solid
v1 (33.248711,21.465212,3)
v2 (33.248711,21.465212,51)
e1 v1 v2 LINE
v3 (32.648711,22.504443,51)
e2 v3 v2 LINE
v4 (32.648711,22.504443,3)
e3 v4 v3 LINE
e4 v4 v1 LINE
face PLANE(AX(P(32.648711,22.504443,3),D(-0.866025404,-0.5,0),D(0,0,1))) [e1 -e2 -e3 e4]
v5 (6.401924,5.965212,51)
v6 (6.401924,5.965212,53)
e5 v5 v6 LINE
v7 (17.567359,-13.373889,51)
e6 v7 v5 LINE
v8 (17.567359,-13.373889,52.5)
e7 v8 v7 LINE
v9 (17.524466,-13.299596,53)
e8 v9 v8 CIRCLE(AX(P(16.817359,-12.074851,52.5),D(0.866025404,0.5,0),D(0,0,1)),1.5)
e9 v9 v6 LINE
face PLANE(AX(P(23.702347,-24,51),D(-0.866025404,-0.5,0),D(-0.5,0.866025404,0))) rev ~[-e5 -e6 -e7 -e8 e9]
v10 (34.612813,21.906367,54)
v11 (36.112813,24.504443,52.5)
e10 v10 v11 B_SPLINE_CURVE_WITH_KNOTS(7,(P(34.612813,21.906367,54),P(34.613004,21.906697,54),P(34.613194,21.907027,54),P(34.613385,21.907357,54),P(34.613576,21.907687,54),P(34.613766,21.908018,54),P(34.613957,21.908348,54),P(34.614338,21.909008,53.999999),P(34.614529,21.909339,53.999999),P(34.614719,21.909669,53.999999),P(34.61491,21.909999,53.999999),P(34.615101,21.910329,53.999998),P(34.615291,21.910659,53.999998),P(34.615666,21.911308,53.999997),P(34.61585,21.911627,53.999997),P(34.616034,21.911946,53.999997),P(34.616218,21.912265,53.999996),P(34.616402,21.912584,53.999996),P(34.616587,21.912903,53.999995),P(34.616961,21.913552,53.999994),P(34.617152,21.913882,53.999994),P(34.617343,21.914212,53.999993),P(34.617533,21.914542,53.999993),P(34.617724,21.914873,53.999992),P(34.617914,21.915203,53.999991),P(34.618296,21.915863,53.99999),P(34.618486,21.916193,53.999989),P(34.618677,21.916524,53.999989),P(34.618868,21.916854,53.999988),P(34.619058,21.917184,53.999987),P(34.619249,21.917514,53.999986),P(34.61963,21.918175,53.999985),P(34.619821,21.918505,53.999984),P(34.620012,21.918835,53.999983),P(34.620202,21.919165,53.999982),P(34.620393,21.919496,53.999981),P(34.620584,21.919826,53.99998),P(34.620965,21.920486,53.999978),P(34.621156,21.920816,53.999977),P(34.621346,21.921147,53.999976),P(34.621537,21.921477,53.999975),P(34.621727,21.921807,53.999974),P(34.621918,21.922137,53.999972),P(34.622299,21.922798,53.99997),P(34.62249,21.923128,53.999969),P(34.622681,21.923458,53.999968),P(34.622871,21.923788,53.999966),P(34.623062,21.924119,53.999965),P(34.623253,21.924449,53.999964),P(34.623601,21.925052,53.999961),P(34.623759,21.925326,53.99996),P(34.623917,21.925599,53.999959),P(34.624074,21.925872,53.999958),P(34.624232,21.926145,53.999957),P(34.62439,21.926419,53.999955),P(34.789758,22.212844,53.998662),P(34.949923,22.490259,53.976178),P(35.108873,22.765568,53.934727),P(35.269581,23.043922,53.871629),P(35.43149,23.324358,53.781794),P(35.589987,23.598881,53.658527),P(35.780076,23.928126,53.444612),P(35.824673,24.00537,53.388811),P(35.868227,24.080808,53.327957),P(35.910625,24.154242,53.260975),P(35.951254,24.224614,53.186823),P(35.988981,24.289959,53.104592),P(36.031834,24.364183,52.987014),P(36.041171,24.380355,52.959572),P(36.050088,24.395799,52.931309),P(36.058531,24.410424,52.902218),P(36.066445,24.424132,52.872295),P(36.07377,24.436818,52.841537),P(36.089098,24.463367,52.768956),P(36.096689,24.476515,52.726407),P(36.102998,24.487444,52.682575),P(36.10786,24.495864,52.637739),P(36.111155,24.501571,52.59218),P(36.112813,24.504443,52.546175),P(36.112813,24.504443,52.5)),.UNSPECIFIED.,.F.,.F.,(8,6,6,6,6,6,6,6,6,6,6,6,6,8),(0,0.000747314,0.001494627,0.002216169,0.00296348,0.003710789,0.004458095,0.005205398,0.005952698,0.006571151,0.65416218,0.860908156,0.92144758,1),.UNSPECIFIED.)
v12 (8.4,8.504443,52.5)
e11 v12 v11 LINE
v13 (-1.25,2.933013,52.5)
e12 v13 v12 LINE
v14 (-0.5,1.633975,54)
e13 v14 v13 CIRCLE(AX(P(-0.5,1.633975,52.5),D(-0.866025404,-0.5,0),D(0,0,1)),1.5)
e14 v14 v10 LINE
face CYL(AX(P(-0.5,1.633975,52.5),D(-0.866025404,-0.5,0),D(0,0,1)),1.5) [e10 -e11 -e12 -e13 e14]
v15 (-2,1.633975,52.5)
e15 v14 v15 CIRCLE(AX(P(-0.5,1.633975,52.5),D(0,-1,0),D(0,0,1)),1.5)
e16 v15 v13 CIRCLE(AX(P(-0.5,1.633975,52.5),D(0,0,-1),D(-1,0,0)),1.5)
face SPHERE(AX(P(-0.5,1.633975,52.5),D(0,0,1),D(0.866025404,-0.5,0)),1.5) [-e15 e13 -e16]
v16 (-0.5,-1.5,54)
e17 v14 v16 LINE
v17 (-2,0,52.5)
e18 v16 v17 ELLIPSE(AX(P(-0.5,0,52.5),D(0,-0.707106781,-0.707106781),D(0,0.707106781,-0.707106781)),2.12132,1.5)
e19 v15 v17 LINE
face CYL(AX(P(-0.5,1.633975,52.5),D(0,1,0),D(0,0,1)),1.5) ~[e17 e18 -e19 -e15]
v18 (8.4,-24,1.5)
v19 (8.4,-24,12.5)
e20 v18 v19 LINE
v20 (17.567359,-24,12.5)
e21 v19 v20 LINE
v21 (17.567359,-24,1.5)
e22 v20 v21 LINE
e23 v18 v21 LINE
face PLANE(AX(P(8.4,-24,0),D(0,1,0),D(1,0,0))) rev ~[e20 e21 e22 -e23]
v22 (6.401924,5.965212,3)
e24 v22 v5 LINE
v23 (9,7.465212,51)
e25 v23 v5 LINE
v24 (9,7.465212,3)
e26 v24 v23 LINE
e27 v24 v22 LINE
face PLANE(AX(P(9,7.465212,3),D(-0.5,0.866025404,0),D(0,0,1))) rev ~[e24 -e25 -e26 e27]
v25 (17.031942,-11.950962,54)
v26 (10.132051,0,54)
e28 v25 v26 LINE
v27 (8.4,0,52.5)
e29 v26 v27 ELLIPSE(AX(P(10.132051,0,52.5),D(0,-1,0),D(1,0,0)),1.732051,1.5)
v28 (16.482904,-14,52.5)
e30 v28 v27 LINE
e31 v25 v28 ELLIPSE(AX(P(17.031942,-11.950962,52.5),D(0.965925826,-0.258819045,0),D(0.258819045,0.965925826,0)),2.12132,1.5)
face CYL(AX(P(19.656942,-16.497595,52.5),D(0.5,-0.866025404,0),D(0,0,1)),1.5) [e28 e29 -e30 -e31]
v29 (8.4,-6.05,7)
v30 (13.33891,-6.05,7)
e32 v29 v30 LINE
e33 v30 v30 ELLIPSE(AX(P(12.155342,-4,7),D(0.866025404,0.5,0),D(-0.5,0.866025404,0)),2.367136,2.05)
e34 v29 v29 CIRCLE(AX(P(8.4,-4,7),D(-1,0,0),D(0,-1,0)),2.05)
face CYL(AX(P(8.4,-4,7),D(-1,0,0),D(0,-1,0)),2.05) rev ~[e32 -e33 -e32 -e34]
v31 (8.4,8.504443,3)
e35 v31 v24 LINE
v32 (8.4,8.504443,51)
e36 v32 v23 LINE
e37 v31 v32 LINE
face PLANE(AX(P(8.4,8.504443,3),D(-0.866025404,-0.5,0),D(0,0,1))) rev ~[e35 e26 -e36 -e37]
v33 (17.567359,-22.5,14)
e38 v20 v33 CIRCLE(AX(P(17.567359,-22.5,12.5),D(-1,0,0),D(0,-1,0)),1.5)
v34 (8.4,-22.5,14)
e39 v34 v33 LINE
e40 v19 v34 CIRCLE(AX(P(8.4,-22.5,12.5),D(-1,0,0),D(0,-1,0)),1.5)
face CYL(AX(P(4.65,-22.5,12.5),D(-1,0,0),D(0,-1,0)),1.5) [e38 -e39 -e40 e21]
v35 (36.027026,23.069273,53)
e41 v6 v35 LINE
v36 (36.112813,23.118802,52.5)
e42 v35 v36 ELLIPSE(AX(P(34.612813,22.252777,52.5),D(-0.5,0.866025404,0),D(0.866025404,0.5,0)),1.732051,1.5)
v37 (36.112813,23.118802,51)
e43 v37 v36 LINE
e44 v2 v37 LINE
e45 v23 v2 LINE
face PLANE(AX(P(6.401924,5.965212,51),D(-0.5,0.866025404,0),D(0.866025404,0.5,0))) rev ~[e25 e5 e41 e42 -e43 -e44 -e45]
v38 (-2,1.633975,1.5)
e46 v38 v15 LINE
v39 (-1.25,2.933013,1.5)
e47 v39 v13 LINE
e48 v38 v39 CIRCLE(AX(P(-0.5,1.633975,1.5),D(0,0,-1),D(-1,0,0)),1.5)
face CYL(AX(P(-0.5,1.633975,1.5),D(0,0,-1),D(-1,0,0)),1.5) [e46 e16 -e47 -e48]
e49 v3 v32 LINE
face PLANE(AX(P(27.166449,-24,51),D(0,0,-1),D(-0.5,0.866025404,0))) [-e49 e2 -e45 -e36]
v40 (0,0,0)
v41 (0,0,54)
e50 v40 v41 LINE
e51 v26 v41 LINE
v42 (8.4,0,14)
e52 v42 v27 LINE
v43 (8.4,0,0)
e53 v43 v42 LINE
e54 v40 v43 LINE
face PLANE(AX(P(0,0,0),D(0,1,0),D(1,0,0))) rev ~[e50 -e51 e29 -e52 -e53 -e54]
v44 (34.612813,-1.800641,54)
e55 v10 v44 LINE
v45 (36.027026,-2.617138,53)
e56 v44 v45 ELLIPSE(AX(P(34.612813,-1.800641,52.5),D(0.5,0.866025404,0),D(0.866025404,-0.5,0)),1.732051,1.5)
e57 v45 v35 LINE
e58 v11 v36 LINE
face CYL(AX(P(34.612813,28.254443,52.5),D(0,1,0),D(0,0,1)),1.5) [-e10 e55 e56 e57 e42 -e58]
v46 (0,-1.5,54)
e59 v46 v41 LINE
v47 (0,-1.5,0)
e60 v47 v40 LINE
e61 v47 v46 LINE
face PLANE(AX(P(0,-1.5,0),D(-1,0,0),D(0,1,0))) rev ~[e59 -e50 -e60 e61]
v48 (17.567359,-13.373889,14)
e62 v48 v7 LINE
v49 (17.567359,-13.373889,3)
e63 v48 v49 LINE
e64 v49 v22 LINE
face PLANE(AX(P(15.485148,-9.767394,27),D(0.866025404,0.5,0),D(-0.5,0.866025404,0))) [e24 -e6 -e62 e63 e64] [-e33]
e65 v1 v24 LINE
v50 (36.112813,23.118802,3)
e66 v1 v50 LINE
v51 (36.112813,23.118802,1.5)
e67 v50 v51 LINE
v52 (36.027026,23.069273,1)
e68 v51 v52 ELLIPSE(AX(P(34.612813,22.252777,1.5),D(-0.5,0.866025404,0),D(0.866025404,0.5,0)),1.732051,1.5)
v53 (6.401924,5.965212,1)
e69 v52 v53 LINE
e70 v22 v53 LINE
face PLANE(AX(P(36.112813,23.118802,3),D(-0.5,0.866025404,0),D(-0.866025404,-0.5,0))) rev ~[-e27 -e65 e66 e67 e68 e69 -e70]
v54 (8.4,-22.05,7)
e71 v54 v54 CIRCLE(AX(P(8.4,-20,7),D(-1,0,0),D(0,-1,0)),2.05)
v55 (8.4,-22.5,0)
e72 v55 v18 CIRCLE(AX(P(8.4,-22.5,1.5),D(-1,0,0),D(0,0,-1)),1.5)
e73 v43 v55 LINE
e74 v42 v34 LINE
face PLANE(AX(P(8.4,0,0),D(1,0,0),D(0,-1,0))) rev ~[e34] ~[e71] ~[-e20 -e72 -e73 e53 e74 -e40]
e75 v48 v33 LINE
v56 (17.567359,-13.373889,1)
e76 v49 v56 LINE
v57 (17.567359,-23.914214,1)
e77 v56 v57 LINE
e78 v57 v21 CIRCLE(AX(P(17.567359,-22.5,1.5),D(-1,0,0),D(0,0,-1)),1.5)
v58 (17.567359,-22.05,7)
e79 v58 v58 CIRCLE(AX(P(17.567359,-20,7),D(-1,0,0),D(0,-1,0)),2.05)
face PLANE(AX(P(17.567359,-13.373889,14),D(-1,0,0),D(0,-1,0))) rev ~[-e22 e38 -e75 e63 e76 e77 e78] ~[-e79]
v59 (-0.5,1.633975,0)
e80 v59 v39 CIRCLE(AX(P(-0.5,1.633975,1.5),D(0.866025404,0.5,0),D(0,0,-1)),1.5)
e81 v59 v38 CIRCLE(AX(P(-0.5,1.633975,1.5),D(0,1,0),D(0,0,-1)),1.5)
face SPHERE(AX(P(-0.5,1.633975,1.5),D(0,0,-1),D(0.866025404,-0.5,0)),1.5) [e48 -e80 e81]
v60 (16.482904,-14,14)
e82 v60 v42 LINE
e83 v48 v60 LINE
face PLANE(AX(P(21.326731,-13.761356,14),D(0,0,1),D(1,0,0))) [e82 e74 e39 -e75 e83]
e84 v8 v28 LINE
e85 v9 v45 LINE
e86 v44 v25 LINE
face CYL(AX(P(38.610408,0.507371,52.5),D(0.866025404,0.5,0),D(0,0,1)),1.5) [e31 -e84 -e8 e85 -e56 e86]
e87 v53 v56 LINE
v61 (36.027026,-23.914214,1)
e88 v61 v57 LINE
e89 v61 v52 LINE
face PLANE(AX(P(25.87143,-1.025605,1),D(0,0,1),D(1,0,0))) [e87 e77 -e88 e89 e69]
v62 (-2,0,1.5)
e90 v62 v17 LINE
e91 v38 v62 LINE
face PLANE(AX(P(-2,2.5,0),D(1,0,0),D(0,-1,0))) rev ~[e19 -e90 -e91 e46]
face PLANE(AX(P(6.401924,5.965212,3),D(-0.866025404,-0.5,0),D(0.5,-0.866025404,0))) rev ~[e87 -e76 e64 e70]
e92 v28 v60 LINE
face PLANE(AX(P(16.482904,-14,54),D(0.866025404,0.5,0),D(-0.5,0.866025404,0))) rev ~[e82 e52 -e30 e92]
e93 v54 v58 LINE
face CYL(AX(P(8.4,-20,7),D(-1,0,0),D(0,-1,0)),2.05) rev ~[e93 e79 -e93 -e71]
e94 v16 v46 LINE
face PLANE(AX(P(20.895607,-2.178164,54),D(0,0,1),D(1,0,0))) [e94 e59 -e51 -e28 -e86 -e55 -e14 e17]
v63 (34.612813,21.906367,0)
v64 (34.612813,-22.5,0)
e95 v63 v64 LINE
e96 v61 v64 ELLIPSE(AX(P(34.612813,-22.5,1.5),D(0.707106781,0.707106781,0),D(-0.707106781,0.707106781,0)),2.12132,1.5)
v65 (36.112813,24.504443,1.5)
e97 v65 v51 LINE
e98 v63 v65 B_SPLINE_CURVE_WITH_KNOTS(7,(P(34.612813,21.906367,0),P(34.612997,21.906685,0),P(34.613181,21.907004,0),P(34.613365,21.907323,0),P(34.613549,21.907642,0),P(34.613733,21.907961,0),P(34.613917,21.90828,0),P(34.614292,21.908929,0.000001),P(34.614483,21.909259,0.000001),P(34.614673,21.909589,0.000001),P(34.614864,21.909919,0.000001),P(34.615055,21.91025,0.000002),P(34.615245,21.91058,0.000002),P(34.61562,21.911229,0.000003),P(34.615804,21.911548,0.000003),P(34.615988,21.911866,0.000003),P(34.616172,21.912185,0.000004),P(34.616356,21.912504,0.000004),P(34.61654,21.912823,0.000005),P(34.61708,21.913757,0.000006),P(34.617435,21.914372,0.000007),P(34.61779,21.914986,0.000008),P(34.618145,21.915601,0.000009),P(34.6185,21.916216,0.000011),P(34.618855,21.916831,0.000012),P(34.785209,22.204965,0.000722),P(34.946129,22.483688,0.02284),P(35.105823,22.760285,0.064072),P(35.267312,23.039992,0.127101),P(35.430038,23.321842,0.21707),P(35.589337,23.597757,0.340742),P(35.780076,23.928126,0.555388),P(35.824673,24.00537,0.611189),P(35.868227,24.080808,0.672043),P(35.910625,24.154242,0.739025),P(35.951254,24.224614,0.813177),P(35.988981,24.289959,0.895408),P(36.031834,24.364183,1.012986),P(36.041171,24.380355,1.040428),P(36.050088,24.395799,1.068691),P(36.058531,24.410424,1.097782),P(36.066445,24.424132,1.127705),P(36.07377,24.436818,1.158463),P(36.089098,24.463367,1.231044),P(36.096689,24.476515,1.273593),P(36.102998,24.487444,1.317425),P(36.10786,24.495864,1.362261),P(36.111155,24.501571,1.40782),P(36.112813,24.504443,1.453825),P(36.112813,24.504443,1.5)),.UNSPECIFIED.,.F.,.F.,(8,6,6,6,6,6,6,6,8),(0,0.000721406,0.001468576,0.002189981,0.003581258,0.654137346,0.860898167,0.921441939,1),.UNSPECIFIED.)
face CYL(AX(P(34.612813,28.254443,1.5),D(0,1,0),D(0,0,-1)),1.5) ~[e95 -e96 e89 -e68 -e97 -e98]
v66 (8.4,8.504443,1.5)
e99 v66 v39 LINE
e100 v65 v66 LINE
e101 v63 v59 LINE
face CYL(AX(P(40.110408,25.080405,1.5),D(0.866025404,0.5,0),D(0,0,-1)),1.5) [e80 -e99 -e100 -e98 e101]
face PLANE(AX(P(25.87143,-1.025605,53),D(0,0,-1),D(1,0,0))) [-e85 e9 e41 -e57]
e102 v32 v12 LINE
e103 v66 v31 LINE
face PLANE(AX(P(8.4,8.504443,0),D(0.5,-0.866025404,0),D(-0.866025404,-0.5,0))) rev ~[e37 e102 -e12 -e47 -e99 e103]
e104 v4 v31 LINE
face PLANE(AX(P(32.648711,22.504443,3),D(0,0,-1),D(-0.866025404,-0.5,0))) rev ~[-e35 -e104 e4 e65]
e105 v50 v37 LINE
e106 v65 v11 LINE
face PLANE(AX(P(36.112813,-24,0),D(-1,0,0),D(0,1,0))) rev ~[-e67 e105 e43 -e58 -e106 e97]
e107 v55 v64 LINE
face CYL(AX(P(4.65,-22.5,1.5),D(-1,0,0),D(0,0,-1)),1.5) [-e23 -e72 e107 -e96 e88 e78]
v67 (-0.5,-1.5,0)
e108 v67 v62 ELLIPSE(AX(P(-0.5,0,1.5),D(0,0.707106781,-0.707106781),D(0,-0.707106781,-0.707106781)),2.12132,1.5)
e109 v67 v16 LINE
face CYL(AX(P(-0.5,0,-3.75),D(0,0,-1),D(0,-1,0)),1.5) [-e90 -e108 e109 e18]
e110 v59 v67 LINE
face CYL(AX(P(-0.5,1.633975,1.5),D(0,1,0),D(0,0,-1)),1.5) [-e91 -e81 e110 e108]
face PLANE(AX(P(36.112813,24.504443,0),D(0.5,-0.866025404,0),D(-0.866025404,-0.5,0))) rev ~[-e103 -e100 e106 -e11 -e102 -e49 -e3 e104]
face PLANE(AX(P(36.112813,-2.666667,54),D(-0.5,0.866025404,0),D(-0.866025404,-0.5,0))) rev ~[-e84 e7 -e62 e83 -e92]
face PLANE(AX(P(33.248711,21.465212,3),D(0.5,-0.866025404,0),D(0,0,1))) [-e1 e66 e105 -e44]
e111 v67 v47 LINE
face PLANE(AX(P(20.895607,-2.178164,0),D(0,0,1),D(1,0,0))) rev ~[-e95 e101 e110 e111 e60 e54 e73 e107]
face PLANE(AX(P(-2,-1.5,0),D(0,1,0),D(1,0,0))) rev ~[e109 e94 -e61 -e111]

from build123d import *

# Parameters (mm, degrees)
F1_DEPTH      = 54
F2_W          = 28
F2_H          = 48
F3_DEPTH      = 50
F4_W          = 36.3328976004
F4_H          = 48
F5_DEPTH      = 3
F6_W          = 5.7282032303
F6_H          = 48
F7_DEPTH      = 20
F9_DEPTH      = 2
F11_DEPTH     = 2
F13_DEPTH     = 40
F15_DEPTH     = 13
F16_R         = 2.05
F17_DEPTH     = 25
F18_T1_DEPTH  = 46.8928601954
F18_T3_DEPTH  = 61.5
F18_T5_DEPTH  = 6.8839745962
F18_T7_DEPTH  = 30.1666666667
F18_T9_DEPTH  = 56.0044427996
F18_T11_DEPTH = 35.2128129211
F18_T13_DEPTH = 51
F18_T15_DEPTH = 16.667359312
F18_T17_DEPTH = 46.8928601954
F18_T19_DEPTH = 34.6711094662
F18_T24_DEPTH = 1.5
F18_T30_DEPTH = 1.5
F18_T36_DEPTH = 23.6658075373


# Not quite as in the source:
# - a fillet or chamfer that OpenCascade refuses, or shapes differently, is made with other operations: its cross-section is extruded or revolved along the edge and cut away or added


with BuildPart() as f1:
    # F0 (on Top) → F1 (new body)
    with BuildSketch(Plane.XY):
        Polygon((0, -1.5), (0, 0), (8.4, 0), (8.4, -24), (36.1128129211, -24), (36.1128129211, 24.5044427996), (8.4, 8.5044427996), (-2, 2.5), (-2, -1.5), align=None)
    extrude(amount=F1_DEPTH)

    # F2 (on face) → F3 (cut)
    with BuildSketch(Plane(origin=(-1.5825317547, 2.7410254038, 0), x_dir=(-0.8660254038, -0.5, 0), z_dir=(-0.5, 0.8660254038, 0))):
        with Locations((-25.5268347916, 27)):
            Rectangle(F2_W, F2_H)
    extrude(amount=-F3_DEPTH, mode=Mode.SUBTRACT)

    # F4 (on face) → F5 (cut)
    with BuildSketch(Plane(origin=(9.9825317547, 5.7634173958, 0), x_dir=(-0.5, 0.8660254038, 0), z_dir=(0.8660254038, 0.5, 0))):
        with Locations((-16.2013852907, 27)):
            Rectangle(F4_W, F4_H)
    extrude(amount=-F5_DEPTH, mode=Mode.SUBTRACT)

    # F6 (on face) → F7 (cut)
    with BuildSketch(Plane(origin=(34.2312430607, 19.7634173958, 0), x_dir=(0.5, -0.8660254038, 0), z_dir=(-0.8660254038, -0.5, 0))):
        with Locations((0.8990381057, 27)):
            Rectangle(F6_W, F6_H)
    extrude(amount=-F7_DEPTH, mode=Mode.SUBTRACT)

    # F8 (on face) → F9 (cut)
    with BuildSketch(Plane(origin=(0, 0, 51), x_dir=(1, 0, 0), z_dir=(0, 0, -1))):
        Polygon((36.1128129211, -23.1188021535), (36.1128129211, 24), (23.7023471851, 24), (6.4019237886, -5.965212315), align=None)
    extrude(amount=-F9_DEPTH, mode=Mode.SUBTRACT)

    # F10 (on face) → F11 (cut)
    with BuildSketch(Plane.XY.offset(3)):
        Polygon((36.1128129211, 23.1188021535), (6.4019237886, 5.965212315), (23.7023471851, -24), (36.1128129211, -24), align=None)
    extrude(amount=-F11_DEPTH, mode=Mode.SUBTRACT)

    # F12 (on face) → F13 (cut)
    with BuildSketch(Plane.XY.offset(54)):
        Polygon((16.4829037687, -14), (8.4, 0), (8.4, -24), (36.1128129211, -24), (36.1128129211, -2.6666666667), align=None)
    extrude(amount=-F13_DEPTH, mode=Mode.SUBTRACT)

    # F14 (on face) → F15 (cut)
    with BuildSketch(Plane.XY.offset(14)):
        Polygon((23.7023471851, -24), (17.567359312, -13.3738893001), (17.567359312, -24), align=None)
    extrude(amount=-F15_DEPTH, mode=Mode.SUBTRACT)

    # F16 (on face) → F17 (cut)
    with BuildSketch(Plane(origin=(8.4, 0, 0), x_dir=(0, -1, 0), z_dir=(-1, 0, 0))):
        with Locations((20, 7)):
            Circle(F16_R)
        with Locations((4, 7)):
            Circle(F16_R)
    extrude(amount=-F17_DEPTH, mode=Mode.SUBTRACT)

    # F18: fillet of radius 1.5 on 12 edges, made by hand

    # F18_s2 → F18_t1 (cut)
    with BuildSketch(Plane(origin=(0.3325317547, 0.1919872981, 0), x_dir=(0, 0, 1), z_dir=(0.8660254038, 0.5, 0))):
        with BuildLine():
            ThreePointArc((54, -1.6650635095), (53.5606601718, -2.7257236812), (52.5, -3.1650635095))
            Line((52.5, -3.1650635095), (54, -3.1650635095))
            Line((54, -3.1650635095), (54, -1.6650635095))
        make_face()
    extrude(amount=F18_T1_DEPTH, mode=Mode.SUBTRACT)

    # F18_s4 → F18_t3 (cut)
    with BuildSketch(Plane.XY.offset(-3.75)):
        with BuildLine():
            ThreePointArc((-0.5, -1.5), (-1.5606601718, -1.0606601718), (-2, 0))
            Line((-2, 0), (-2, -1.5))
            Line((-2, -1.5), (-0.5, -1.5))
        make_face()
    extrude(amount=F18_T3_DEPTH, mode=Mode.SUBTRACT)

    # F18_s6 → F18_t5 (cut)
    with BuildSketch(Plane.XZ.offset(-1.6339745962)):
        with BuildLine():
            ThreePointArc((-0.5, 54), (-1.5606601718, 53.5606601718), (-2, 52.5))
            Line((-2, 52.5), (-2, 54))
            Line((-2, 54), (-0.5, 54))
        make_face()
        with BuildLine():
            ThreePointArc((-0.5, 0), (-1.5606601718, 0.4393398282), (-2, 1.5))
            Line((-2, 1.5), (-2, 0))
            Line((-2, 0), (-0.5, 0))
        make_face()
    extrude(amount=F18_T5_DEPTH, mode=Mode.SUBTRACT)

    # F18_s8 → F18_t7 (cut)
    with BuildSketch(Plane(origin=(29.1775044166, 16.8456400292, 0), x_dir=(0, 0, 1), z_dir=(-0.8660254038, -0.5, 0))):
        with BuildLine():
            ThreePointArc((54, -18.8658075373), (53.5606601718, -19.9264677091), (52.5, -20.3658075373))
            Line((52.5, -20.3658075373), (54, -20.3658075373))
            Line((54, -20.3658075373), (54, -18.8658075373))
        make_face()
    extrude(amount=F18_T7_DEPTH, mode=Mode.SUBTRACT)

    # F18_s10 → F18_t9 (cut)
    with BuildSketch(Plane.XZ.offset(-28.2544427996)):
        with BuildLine():
            ThreePointArc((34.6128129211, 0), (35.6734730929, 0.4393398282), (36.1128129211, 1.5))
            Line((36.1128129211, 1.5), (36.1128129211, 0))
            Line((36.1128129211, 0), (34.6128129211, 0))
        make_face()
    extrude(amount=F18_T9_DEPTH, mode=Mode.SUBTRACT)

    # F18_s12 → F18_t11 (cut)
    with BuildSketch(Plane.YZ.offset(4.65)):
        with BuildLine():
            ThreePointArc((-22.5, 0), (-23.5606601718, 0.4393398282), (-24, 1.5))
            Line((-24, 1.5), (-24, 0))
            Line((-24, 0), (-22.5, 0))
        make_face()
    extrude(amount=F18_T11_DEPTH, mode=Mode.SUBTRACT)

    # F18_s14 → F18_t13 (cut)
    with BuildSketch(Plane.XY.offset(1.5)):
        with BuildLine():
            ThreePointArc((-2, 1.6339745962), (-1.7990381057, 2.3839745962), (-1.25, 2.9330127019))
            Line((-1.25, 2.9330127019), (-2, 2.5))
            Line((-2, 2.5), (-2, 1.6339745962))
        make_face()
    extrude(amount=F18_T13_DEPTH, mode=Mode.SUBTRACT)

    # F18_s16 → F18_t15 (cut)
    with BuildSketch(Plane.YZ.offset(4.65)):
        with BuildLine():
            ThreePointArc((-24, 12.5), (-23.5606601718, 13.5606601718), (-22.5, 14))
            Line((-22.5, 14), (-24, 14))
            Line((-24, 14), (-24, 12.5))
        make_face()
    extrude(amount=F18_T15_DEPTH, mode=Mode.SUBTRACT)

    # F18_s18 → F18_t17 (cut)
    with BuildSketch(Plane(origin=(40.94293994, 23.6384173958, 0), x_dir=(0, 0, 1), z_dir=(-0.8660254038, -0.5, 0))):
        with BuildLine():
            ThreePointArc((0, 1.6650635095), (0.4393398282, 2.7257236812), (1.5, 3.1650635095))
            Line((1.5, 3.1650635095), (0, 3.1650635095))
            Line((0, 3.1650635095), (0, 1.6650635095))
        make_face()
    extrude(amount=F18_T17_DEPTH, mode=Mode.SUBTRACT)

    # F18_s20 → F18_t19 (cut)
    with BuildSketch(Plane.XZ.offset(-28.2544427996)):
        with BuildLine():
            ThreePointArc((34.6128129211, 54), (35.6734730929, 53.5606601718), (36.1128129211, 52.5))
            Line((36.1128129211, 52.5), (36.1128129211, 54))
            Line((36.1128129211, 54), (34.6128129211, 54))
        make_face()
    extrude(amount=F18_T19_DEPTH, mode=Mode.SUBTRACT)


with BuildPart() as f18_tool22:
    # F18_s23 → F18_t24 (new body)
    with BuildSketch(Plane.XY.offset(52.5)):
        Polygon((-0.5, 1.6339745962), (-2, 1.6339745962), (-2, 2.5), (-1.25, 2.9330127019), align=None)
    extrude(amount=F18_T24_DEPTH)

    # F18_s25 → F18_t26 (revolve, cut)
    with BuildSketch(Plane(origin=(-0.5, 1.6339745962, 52.5), x_dir=(0.8660254038, -0.5, 0), z_dir=(-0.5, -0.8660254038, 0))):
        with BuildLine():
            ThreePointArc((0, -1.5), (1.5, 0), (0, 1.5))
            Line((0, 1.5), (0, -1.5))
        make_face()
    revolve(axis=Axis((-0.5, 1.6339745962, 52.5), (0, 0, 1)), mode=Mode.SUBTRACT)


with BuildPart() as f1_1:
    add(f1.part)

    # F18_t21: cut F18_tool22
    add(f18_tool22.part, mode=Mode.SUBTRACT)


with BuildPart() as f18_tool28:
    # F18_s29 → F18_t30 (new body)
    with BuildSketch(Plane.XY.offset(1.5)):
        Polygon((-0.5, 1.6339745962), (-2, 1.6339745962), (-2, 2.5), (-1.25, 2.9330127019), align=None)
    extrude(amount=-F18_T30_DEPTH)

    # F18_s31 → F18_t32 (revolve, cut)
    with BuildSketch(Plane(origin=(-0.5, 1.6339745962, 1.5), x_dir=(0.8660254038, -0.5, 0), z_dir=(0.5, 0.8660254038, 0))):
        with BuildLine():
            ThreePointArc((0, -1.5), (1.5, 0), (0, 1.5))
            Line((0, 1.5), (0, -1.5))
        make_face()
    revolve(axis=Axis((-0.5, 1.6339745962, 1.5), (0, 0, -1)), mode=Mode.SUBTRACT)


with BuildPart() as f1_2:
    add(f1_1.part)

    # F18_t27: cut F18_tool28
    add(f18_tool28.part, mode=Mode.SUBTRACT)


with BuildPart() as f18_tool34:
    # F18_s35 → F18_t36 (new body)
    with BuildSketch(Plane(origin=(12.0579037687, -20.8849019601, 0), x_dir=(0, 0, 1), z_dir=(-0.5, 0.8660254038, 0))):
        with BuildLine():
            ThreePointArc((54, 8.7746133918), (53.5606601718, 7.71395322), (52.5, 7.2746133918))
            Line((52.5, 7.2746133918), (54, 7.2746133918))
            Line((54, 7.2746133918), (54, 8.7746133918))
        make_face()
    extrude(amount=F18_T36_DEPTH)

    split(bisect_by=Plane.XZ, keep=Keep.TOP)


with BuildPart() as f1_3:
    add(f1_2.part)

    # F18_t33: cut F18_tool34
    add(f18_tool34.part, mode=Mode.SUBTRACT)


solid = f1_3.part
